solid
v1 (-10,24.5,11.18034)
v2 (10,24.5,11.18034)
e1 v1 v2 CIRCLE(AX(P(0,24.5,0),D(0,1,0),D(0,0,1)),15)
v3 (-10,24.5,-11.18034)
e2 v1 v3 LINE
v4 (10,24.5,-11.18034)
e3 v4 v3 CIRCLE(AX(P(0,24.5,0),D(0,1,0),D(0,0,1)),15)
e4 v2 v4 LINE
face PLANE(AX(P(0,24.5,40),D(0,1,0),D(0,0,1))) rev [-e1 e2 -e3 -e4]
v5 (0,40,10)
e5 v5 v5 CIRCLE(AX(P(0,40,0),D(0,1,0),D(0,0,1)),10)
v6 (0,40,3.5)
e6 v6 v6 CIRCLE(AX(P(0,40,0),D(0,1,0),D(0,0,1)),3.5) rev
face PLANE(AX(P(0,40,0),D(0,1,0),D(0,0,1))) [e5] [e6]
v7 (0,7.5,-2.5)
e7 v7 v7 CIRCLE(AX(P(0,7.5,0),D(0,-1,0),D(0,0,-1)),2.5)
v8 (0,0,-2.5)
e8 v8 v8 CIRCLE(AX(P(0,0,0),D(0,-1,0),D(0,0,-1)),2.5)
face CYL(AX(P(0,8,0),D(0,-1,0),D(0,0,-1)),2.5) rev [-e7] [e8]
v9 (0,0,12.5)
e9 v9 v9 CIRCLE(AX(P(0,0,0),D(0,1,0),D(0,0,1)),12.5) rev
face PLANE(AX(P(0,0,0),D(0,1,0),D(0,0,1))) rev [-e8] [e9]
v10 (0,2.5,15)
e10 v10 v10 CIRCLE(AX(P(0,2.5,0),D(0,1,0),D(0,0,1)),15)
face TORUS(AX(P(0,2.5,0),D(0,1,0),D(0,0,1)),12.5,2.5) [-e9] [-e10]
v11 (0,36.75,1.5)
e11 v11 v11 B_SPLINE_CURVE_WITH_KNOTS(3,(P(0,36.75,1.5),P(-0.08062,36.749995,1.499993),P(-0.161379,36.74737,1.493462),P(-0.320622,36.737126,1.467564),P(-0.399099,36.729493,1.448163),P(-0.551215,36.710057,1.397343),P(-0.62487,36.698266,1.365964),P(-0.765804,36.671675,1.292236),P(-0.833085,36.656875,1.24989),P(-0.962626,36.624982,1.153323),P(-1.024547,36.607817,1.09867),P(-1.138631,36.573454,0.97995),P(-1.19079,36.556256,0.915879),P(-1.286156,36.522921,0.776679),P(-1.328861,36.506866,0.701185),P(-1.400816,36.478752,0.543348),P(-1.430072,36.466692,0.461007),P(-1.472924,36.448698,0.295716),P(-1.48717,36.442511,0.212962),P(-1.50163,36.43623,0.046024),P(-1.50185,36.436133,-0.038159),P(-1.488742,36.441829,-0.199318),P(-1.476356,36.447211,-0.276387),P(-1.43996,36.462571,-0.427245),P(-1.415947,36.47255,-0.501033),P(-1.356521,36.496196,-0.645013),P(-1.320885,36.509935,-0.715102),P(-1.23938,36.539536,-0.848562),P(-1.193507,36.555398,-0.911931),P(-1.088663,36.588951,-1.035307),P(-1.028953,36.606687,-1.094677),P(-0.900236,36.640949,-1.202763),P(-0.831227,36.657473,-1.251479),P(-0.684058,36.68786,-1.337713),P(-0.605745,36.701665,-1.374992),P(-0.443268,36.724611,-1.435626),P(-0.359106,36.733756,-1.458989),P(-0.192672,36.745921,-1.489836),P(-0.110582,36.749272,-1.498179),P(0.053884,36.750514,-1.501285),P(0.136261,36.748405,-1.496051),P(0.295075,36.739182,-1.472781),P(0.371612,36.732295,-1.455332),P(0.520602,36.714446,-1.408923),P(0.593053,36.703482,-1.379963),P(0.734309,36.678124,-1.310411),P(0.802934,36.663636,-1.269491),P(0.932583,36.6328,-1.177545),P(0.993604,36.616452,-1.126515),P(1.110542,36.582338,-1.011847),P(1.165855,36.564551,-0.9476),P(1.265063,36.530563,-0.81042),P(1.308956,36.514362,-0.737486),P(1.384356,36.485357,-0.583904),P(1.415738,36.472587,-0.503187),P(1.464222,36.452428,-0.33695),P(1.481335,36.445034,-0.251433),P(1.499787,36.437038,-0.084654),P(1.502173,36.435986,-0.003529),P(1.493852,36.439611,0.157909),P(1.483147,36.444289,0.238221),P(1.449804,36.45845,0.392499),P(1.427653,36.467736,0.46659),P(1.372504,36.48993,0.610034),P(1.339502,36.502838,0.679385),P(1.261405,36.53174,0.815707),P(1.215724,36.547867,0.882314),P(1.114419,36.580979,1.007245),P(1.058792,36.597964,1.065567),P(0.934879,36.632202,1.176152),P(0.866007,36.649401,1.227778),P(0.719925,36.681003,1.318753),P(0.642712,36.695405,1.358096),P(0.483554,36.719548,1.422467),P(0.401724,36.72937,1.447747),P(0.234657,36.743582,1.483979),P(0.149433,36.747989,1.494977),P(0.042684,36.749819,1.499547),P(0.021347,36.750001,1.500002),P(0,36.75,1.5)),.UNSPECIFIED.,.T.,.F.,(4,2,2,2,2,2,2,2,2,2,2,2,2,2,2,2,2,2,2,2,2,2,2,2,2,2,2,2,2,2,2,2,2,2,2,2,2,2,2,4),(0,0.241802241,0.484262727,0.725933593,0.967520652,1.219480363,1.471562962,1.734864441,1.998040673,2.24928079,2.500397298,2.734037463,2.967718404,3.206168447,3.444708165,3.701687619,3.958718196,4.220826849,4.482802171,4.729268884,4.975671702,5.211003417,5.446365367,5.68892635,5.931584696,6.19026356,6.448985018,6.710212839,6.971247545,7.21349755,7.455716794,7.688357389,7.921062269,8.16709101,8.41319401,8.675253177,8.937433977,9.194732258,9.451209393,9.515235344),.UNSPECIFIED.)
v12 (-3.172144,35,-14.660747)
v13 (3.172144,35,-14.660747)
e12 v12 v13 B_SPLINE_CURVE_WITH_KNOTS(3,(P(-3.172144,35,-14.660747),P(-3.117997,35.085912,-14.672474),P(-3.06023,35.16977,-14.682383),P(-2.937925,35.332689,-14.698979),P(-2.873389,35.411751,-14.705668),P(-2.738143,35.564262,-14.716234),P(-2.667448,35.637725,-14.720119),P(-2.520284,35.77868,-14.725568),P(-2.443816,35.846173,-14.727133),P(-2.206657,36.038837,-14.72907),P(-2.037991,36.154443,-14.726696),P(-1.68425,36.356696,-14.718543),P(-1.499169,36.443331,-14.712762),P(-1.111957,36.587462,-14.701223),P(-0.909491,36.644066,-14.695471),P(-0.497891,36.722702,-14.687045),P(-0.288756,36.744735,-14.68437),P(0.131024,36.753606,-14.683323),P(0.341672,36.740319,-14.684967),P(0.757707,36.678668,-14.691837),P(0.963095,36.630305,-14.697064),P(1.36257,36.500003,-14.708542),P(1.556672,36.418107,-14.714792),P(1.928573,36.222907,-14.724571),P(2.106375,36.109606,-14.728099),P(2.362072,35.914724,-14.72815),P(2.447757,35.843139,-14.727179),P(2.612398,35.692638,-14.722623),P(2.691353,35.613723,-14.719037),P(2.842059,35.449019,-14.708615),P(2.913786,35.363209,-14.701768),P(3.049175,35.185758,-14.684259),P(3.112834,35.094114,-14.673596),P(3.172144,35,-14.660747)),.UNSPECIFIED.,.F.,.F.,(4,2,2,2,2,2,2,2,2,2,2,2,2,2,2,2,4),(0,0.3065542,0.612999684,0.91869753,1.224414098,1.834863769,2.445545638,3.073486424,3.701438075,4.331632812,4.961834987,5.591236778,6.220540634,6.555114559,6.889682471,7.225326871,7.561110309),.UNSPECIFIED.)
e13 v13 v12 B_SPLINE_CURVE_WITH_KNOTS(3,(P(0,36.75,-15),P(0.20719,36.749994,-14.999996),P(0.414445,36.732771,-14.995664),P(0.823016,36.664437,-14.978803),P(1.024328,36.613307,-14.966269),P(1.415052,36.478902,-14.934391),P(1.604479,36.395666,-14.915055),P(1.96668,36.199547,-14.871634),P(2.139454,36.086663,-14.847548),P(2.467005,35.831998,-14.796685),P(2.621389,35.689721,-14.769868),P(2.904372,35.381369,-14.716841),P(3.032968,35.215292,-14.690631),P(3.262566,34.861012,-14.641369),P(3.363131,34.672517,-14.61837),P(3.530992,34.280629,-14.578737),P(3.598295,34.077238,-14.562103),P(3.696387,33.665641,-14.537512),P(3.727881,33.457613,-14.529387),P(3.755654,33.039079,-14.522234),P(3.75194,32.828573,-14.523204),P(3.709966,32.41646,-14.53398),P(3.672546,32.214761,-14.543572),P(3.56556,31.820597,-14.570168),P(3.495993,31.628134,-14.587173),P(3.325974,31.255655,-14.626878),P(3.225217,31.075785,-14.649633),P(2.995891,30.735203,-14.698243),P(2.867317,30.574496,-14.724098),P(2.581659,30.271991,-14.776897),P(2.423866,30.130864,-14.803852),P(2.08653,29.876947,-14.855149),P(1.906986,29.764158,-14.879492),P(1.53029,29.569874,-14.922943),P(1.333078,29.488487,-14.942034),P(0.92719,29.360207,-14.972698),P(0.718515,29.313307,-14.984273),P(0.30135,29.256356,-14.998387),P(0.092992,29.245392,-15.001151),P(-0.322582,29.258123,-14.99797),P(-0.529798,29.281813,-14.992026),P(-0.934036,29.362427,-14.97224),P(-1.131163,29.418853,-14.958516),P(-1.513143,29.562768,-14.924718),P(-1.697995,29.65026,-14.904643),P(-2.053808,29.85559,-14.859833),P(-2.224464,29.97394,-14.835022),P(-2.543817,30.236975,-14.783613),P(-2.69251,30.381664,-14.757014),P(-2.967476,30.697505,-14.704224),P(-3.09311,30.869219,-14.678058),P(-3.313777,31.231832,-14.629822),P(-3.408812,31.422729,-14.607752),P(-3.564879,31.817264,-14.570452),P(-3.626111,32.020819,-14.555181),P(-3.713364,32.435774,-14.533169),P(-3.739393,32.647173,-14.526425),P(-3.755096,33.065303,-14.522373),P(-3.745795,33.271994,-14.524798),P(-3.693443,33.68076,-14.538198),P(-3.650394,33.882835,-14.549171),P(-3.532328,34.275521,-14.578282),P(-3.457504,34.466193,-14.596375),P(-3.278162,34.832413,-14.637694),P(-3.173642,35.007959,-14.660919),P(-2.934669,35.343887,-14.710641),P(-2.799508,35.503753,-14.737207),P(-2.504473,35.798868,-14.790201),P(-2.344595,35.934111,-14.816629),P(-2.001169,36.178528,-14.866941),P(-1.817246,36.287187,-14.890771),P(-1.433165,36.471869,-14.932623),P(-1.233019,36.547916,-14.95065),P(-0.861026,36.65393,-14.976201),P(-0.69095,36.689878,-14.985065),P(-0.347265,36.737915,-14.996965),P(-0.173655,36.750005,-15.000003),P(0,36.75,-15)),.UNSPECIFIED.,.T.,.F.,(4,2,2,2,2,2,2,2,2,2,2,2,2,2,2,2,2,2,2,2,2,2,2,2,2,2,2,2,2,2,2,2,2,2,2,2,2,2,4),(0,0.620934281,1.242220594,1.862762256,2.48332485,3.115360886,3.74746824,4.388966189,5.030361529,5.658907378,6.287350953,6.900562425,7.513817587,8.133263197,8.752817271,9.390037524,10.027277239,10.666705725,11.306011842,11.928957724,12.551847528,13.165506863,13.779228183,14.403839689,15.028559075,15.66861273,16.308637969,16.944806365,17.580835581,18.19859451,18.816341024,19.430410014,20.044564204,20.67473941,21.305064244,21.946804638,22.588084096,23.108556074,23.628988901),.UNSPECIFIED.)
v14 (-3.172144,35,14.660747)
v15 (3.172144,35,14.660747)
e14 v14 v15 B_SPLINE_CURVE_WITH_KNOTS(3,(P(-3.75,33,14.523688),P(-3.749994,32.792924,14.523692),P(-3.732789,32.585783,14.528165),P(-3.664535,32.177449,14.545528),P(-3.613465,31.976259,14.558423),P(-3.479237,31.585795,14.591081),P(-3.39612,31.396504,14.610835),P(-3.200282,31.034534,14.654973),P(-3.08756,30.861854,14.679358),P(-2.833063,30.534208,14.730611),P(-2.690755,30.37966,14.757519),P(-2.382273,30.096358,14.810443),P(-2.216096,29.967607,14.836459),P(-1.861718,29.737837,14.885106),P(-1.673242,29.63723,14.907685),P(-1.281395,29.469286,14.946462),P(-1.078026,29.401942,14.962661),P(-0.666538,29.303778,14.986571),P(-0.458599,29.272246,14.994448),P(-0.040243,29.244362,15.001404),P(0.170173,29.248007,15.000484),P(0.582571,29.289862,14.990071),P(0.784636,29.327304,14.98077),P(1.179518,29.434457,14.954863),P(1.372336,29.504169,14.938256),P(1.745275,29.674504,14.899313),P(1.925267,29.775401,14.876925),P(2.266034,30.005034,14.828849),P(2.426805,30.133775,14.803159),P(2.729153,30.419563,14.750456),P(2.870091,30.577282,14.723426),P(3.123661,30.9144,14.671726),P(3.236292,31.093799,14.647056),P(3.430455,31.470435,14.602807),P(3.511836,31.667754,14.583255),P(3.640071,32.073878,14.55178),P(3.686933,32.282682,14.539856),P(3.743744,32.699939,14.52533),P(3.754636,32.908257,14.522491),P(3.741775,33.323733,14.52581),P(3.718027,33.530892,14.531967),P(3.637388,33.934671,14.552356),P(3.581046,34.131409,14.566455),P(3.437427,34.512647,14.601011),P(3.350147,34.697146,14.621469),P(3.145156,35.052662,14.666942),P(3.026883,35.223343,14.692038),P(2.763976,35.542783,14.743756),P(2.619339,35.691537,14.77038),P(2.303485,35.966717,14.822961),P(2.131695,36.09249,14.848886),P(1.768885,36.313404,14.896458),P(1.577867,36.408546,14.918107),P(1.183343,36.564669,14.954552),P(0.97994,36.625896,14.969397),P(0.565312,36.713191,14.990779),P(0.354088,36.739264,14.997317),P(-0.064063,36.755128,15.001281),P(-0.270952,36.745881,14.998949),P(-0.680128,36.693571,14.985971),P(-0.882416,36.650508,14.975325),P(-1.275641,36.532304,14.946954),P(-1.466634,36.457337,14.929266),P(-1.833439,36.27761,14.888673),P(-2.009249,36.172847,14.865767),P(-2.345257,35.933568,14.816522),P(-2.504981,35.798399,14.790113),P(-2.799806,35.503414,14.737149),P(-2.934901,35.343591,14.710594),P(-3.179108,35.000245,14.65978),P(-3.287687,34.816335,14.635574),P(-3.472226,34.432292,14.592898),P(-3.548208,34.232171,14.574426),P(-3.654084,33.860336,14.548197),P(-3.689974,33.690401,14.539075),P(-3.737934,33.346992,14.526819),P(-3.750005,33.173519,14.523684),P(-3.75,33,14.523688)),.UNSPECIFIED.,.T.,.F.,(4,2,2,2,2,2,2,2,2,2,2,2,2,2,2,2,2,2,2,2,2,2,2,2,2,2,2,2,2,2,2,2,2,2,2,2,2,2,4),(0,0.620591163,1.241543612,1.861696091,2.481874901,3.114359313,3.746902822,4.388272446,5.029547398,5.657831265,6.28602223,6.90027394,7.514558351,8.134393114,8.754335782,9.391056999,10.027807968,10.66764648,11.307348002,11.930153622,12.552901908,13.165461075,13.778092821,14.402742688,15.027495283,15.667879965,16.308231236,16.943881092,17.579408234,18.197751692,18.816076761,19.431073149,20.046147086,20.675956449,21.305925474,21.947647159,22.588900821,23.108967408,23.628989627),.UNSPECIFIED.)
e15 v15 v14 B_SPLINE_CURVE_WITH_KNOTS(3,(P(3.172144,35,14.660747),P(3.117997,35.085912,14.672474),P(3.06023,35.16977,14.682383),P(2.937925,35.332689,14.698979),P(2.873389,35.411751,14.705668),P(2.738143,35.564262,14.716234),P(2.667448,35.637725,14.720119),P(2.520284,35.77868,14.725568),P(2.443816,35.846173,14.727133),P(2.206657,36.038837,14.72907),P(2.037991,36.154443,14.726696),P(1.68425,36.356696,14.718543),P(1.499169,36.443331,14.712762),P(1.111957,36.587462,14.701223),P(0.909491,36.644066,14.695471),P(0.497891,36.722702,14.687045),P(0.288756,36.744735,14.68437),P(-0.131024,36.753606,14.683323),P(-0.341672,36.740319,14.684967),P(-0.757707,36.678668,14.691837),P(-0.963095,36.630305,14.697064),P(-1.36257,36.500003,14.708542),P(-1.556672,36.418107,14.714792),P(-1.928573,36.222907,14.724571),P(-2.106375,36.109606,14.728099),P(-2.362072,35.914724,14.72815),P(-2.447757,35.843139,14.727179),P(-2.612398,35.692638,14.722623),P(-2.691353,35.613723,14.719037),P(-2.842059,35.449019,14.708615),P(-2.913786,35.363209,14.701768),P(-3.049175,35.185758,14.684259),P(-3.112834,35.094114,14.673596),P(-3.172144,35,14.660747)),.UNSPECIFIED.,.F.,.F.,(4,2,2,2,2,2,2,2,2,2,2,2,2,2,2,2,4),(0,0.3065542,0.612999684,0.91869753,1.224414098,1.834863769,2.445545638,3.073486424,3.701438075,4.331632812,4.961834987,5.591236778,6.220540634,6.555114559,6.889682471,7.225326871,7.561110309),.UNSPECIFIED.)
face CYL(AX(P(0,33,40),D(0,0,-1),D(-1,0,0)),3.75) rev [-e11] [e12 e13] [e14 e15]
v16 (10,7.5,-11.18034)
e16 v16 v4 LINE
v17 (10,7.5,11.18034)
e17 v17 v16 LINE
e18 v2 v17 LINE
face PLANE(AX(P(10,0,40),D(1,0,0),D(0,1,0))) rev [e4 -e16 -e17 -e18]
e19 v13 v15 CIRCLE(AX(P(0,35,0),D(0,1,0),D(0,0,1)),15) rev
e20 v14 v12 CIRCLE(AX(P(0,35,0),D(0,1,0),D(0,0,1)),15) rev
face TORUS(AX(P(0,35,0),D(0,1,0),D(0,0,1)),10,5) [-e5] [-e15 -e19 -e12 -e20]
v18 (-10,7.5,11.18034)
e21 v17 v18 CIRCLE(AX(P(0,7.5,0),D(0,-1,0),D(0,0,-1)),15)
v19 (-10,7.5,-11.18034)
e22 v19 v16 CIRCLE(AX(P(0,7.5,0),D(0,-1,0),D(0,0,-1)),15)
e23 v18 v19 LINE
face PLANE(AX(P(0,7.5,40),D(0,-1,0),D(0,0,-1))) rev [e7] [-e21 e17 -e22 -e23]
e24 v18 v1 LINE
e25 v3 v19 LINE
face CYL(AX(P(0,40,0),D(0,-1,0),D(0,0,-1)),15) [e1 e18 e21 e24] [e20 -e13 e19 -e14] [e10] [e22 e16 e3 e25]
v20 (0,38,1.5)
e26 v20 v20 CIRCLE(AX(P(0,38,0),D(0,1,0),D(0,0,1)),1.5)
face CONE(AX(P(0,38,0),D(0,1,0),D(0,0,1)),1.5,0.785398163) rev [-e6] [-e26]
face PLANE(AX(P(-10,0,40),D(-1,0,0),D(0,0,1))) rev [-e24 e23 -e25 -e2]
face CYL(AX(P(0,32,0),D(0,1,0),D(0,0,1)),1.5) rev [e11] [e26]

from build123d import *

# Parameters (mm, degrees)
SKETCH1_R               = 15
BOSS_EXTRUDE1_DEPTH     = 40
CUT_EXTRUDE1_DEPTH      = 40
CUT_EXTRUDE1_DEPTH_BACK = 40
SKETCH2_R               = 3.75
SKETCH4_R               = 1.5
CUT_EXTRUDE2_DEPTH      = 8
SKETCH5_R               = 2.5
CUT_EXTRUDE3_DEPTH      = 8
FILLET1_R               = 5
CHAMFER1_SIZE           = 2
FILLET2_R               = 2.5


with BuildPart() as part:
    # Sketch1 → Boss-Extrude1 (new body)
    with BuildSketch(Plane(origin=(0, 0, 0), x_dir=(1, 0, 0), z_dir=(0, 1, 0))):
        with Locations(Location((0, 0, 0), (0, 0, 270))):
            Circle(SKETCH1_R)
    extrude(amount=BOSS_EXTRUDE1_DEPTH)

    # Sketch2 → Cut-Extrude1 (cut, two sides: drawn at the far end of the back side and taken through both)
    with BuildSketch(Plane.XY.offset(-CUT_EXTRUDE1_DEPTH_BACK)):
        Polygon((10, 7.5), (0, 7.5), (-10, 7.5), (-10, 24.5), (10, 24.5), align=None)
        with Locations(Location((0, 33, 0), (0, 0, 89.999999996))):
            Circle(SKETCH2_R)
    extrude(amount=CUT_EXTRUDE1_DEPTH + CUT_EXTRUDE1_DEPTH_BACK, mode=Mode.SUBTRACT)

    # Sketch4 → Cut-Extrude2 (cut)
    with BuildSketch(Plane(origin=(0, 40, 0), x_dir=(1, 0, 0), z_dir=(0, 1, 0))):
        with Locations(Location((0, 0, 0), (0, 0, 270))):
            Circle(SKETCH4_R)
    extrude(amount=-CUT_EXTRUDE2_DEPTH, mode=Mode.SUBTRACT)

    # Sketch5 → Cut-Extrude3 (cut)
    with BuildSketch(Plane.XZ):
        with Locations(Location((0, 0, 0), (0, 0, 270))):
            Circle(SKETCH5_R)
    extrude(amount=-CUT_EXTRUDE3_DEPTH, mode=Mode.SUBTRACT)

    # Fillet1
    # the kernel refuses this fillet: 5 mm, written as the material it takes off along each edge
    with BuildSketch(Plane(origin=(0, 40, 0), x_dir=(0, 0, 1), z_dir=(-1, 0, 0))) as fillet1_piece_1:
        with BuildLine():
            CenterArc((15 - FILLET1_R, -FILLET1_R), FILLET1_R, 0, 90)
            Line((15 - FILLET1_R, 0), (15, 0))
            Line((15, 0), (15, -FILLET1_R))
        make_face()
    revolve(axis=Axis((0, 40, 0), (0, 1, 0)), mode=Mode.SUBTRACT)

    # Chamfer1
    chamfer1_edges = [part.edges().sort_by_distance(p)[0] for p in [
        (0, 40, -1.5),
    ]]
    chamfer(chamfer1_edges, length=CHAMFER1_SIZE)

    # Fillet2
    fillet2_edges = [part.edges().sort_by_distance(p)[0] for p in [
        (0, 0, -15),
    ]]
    fillet(fillet2_edges, radius=FILLET2_R)


solid = part.part
